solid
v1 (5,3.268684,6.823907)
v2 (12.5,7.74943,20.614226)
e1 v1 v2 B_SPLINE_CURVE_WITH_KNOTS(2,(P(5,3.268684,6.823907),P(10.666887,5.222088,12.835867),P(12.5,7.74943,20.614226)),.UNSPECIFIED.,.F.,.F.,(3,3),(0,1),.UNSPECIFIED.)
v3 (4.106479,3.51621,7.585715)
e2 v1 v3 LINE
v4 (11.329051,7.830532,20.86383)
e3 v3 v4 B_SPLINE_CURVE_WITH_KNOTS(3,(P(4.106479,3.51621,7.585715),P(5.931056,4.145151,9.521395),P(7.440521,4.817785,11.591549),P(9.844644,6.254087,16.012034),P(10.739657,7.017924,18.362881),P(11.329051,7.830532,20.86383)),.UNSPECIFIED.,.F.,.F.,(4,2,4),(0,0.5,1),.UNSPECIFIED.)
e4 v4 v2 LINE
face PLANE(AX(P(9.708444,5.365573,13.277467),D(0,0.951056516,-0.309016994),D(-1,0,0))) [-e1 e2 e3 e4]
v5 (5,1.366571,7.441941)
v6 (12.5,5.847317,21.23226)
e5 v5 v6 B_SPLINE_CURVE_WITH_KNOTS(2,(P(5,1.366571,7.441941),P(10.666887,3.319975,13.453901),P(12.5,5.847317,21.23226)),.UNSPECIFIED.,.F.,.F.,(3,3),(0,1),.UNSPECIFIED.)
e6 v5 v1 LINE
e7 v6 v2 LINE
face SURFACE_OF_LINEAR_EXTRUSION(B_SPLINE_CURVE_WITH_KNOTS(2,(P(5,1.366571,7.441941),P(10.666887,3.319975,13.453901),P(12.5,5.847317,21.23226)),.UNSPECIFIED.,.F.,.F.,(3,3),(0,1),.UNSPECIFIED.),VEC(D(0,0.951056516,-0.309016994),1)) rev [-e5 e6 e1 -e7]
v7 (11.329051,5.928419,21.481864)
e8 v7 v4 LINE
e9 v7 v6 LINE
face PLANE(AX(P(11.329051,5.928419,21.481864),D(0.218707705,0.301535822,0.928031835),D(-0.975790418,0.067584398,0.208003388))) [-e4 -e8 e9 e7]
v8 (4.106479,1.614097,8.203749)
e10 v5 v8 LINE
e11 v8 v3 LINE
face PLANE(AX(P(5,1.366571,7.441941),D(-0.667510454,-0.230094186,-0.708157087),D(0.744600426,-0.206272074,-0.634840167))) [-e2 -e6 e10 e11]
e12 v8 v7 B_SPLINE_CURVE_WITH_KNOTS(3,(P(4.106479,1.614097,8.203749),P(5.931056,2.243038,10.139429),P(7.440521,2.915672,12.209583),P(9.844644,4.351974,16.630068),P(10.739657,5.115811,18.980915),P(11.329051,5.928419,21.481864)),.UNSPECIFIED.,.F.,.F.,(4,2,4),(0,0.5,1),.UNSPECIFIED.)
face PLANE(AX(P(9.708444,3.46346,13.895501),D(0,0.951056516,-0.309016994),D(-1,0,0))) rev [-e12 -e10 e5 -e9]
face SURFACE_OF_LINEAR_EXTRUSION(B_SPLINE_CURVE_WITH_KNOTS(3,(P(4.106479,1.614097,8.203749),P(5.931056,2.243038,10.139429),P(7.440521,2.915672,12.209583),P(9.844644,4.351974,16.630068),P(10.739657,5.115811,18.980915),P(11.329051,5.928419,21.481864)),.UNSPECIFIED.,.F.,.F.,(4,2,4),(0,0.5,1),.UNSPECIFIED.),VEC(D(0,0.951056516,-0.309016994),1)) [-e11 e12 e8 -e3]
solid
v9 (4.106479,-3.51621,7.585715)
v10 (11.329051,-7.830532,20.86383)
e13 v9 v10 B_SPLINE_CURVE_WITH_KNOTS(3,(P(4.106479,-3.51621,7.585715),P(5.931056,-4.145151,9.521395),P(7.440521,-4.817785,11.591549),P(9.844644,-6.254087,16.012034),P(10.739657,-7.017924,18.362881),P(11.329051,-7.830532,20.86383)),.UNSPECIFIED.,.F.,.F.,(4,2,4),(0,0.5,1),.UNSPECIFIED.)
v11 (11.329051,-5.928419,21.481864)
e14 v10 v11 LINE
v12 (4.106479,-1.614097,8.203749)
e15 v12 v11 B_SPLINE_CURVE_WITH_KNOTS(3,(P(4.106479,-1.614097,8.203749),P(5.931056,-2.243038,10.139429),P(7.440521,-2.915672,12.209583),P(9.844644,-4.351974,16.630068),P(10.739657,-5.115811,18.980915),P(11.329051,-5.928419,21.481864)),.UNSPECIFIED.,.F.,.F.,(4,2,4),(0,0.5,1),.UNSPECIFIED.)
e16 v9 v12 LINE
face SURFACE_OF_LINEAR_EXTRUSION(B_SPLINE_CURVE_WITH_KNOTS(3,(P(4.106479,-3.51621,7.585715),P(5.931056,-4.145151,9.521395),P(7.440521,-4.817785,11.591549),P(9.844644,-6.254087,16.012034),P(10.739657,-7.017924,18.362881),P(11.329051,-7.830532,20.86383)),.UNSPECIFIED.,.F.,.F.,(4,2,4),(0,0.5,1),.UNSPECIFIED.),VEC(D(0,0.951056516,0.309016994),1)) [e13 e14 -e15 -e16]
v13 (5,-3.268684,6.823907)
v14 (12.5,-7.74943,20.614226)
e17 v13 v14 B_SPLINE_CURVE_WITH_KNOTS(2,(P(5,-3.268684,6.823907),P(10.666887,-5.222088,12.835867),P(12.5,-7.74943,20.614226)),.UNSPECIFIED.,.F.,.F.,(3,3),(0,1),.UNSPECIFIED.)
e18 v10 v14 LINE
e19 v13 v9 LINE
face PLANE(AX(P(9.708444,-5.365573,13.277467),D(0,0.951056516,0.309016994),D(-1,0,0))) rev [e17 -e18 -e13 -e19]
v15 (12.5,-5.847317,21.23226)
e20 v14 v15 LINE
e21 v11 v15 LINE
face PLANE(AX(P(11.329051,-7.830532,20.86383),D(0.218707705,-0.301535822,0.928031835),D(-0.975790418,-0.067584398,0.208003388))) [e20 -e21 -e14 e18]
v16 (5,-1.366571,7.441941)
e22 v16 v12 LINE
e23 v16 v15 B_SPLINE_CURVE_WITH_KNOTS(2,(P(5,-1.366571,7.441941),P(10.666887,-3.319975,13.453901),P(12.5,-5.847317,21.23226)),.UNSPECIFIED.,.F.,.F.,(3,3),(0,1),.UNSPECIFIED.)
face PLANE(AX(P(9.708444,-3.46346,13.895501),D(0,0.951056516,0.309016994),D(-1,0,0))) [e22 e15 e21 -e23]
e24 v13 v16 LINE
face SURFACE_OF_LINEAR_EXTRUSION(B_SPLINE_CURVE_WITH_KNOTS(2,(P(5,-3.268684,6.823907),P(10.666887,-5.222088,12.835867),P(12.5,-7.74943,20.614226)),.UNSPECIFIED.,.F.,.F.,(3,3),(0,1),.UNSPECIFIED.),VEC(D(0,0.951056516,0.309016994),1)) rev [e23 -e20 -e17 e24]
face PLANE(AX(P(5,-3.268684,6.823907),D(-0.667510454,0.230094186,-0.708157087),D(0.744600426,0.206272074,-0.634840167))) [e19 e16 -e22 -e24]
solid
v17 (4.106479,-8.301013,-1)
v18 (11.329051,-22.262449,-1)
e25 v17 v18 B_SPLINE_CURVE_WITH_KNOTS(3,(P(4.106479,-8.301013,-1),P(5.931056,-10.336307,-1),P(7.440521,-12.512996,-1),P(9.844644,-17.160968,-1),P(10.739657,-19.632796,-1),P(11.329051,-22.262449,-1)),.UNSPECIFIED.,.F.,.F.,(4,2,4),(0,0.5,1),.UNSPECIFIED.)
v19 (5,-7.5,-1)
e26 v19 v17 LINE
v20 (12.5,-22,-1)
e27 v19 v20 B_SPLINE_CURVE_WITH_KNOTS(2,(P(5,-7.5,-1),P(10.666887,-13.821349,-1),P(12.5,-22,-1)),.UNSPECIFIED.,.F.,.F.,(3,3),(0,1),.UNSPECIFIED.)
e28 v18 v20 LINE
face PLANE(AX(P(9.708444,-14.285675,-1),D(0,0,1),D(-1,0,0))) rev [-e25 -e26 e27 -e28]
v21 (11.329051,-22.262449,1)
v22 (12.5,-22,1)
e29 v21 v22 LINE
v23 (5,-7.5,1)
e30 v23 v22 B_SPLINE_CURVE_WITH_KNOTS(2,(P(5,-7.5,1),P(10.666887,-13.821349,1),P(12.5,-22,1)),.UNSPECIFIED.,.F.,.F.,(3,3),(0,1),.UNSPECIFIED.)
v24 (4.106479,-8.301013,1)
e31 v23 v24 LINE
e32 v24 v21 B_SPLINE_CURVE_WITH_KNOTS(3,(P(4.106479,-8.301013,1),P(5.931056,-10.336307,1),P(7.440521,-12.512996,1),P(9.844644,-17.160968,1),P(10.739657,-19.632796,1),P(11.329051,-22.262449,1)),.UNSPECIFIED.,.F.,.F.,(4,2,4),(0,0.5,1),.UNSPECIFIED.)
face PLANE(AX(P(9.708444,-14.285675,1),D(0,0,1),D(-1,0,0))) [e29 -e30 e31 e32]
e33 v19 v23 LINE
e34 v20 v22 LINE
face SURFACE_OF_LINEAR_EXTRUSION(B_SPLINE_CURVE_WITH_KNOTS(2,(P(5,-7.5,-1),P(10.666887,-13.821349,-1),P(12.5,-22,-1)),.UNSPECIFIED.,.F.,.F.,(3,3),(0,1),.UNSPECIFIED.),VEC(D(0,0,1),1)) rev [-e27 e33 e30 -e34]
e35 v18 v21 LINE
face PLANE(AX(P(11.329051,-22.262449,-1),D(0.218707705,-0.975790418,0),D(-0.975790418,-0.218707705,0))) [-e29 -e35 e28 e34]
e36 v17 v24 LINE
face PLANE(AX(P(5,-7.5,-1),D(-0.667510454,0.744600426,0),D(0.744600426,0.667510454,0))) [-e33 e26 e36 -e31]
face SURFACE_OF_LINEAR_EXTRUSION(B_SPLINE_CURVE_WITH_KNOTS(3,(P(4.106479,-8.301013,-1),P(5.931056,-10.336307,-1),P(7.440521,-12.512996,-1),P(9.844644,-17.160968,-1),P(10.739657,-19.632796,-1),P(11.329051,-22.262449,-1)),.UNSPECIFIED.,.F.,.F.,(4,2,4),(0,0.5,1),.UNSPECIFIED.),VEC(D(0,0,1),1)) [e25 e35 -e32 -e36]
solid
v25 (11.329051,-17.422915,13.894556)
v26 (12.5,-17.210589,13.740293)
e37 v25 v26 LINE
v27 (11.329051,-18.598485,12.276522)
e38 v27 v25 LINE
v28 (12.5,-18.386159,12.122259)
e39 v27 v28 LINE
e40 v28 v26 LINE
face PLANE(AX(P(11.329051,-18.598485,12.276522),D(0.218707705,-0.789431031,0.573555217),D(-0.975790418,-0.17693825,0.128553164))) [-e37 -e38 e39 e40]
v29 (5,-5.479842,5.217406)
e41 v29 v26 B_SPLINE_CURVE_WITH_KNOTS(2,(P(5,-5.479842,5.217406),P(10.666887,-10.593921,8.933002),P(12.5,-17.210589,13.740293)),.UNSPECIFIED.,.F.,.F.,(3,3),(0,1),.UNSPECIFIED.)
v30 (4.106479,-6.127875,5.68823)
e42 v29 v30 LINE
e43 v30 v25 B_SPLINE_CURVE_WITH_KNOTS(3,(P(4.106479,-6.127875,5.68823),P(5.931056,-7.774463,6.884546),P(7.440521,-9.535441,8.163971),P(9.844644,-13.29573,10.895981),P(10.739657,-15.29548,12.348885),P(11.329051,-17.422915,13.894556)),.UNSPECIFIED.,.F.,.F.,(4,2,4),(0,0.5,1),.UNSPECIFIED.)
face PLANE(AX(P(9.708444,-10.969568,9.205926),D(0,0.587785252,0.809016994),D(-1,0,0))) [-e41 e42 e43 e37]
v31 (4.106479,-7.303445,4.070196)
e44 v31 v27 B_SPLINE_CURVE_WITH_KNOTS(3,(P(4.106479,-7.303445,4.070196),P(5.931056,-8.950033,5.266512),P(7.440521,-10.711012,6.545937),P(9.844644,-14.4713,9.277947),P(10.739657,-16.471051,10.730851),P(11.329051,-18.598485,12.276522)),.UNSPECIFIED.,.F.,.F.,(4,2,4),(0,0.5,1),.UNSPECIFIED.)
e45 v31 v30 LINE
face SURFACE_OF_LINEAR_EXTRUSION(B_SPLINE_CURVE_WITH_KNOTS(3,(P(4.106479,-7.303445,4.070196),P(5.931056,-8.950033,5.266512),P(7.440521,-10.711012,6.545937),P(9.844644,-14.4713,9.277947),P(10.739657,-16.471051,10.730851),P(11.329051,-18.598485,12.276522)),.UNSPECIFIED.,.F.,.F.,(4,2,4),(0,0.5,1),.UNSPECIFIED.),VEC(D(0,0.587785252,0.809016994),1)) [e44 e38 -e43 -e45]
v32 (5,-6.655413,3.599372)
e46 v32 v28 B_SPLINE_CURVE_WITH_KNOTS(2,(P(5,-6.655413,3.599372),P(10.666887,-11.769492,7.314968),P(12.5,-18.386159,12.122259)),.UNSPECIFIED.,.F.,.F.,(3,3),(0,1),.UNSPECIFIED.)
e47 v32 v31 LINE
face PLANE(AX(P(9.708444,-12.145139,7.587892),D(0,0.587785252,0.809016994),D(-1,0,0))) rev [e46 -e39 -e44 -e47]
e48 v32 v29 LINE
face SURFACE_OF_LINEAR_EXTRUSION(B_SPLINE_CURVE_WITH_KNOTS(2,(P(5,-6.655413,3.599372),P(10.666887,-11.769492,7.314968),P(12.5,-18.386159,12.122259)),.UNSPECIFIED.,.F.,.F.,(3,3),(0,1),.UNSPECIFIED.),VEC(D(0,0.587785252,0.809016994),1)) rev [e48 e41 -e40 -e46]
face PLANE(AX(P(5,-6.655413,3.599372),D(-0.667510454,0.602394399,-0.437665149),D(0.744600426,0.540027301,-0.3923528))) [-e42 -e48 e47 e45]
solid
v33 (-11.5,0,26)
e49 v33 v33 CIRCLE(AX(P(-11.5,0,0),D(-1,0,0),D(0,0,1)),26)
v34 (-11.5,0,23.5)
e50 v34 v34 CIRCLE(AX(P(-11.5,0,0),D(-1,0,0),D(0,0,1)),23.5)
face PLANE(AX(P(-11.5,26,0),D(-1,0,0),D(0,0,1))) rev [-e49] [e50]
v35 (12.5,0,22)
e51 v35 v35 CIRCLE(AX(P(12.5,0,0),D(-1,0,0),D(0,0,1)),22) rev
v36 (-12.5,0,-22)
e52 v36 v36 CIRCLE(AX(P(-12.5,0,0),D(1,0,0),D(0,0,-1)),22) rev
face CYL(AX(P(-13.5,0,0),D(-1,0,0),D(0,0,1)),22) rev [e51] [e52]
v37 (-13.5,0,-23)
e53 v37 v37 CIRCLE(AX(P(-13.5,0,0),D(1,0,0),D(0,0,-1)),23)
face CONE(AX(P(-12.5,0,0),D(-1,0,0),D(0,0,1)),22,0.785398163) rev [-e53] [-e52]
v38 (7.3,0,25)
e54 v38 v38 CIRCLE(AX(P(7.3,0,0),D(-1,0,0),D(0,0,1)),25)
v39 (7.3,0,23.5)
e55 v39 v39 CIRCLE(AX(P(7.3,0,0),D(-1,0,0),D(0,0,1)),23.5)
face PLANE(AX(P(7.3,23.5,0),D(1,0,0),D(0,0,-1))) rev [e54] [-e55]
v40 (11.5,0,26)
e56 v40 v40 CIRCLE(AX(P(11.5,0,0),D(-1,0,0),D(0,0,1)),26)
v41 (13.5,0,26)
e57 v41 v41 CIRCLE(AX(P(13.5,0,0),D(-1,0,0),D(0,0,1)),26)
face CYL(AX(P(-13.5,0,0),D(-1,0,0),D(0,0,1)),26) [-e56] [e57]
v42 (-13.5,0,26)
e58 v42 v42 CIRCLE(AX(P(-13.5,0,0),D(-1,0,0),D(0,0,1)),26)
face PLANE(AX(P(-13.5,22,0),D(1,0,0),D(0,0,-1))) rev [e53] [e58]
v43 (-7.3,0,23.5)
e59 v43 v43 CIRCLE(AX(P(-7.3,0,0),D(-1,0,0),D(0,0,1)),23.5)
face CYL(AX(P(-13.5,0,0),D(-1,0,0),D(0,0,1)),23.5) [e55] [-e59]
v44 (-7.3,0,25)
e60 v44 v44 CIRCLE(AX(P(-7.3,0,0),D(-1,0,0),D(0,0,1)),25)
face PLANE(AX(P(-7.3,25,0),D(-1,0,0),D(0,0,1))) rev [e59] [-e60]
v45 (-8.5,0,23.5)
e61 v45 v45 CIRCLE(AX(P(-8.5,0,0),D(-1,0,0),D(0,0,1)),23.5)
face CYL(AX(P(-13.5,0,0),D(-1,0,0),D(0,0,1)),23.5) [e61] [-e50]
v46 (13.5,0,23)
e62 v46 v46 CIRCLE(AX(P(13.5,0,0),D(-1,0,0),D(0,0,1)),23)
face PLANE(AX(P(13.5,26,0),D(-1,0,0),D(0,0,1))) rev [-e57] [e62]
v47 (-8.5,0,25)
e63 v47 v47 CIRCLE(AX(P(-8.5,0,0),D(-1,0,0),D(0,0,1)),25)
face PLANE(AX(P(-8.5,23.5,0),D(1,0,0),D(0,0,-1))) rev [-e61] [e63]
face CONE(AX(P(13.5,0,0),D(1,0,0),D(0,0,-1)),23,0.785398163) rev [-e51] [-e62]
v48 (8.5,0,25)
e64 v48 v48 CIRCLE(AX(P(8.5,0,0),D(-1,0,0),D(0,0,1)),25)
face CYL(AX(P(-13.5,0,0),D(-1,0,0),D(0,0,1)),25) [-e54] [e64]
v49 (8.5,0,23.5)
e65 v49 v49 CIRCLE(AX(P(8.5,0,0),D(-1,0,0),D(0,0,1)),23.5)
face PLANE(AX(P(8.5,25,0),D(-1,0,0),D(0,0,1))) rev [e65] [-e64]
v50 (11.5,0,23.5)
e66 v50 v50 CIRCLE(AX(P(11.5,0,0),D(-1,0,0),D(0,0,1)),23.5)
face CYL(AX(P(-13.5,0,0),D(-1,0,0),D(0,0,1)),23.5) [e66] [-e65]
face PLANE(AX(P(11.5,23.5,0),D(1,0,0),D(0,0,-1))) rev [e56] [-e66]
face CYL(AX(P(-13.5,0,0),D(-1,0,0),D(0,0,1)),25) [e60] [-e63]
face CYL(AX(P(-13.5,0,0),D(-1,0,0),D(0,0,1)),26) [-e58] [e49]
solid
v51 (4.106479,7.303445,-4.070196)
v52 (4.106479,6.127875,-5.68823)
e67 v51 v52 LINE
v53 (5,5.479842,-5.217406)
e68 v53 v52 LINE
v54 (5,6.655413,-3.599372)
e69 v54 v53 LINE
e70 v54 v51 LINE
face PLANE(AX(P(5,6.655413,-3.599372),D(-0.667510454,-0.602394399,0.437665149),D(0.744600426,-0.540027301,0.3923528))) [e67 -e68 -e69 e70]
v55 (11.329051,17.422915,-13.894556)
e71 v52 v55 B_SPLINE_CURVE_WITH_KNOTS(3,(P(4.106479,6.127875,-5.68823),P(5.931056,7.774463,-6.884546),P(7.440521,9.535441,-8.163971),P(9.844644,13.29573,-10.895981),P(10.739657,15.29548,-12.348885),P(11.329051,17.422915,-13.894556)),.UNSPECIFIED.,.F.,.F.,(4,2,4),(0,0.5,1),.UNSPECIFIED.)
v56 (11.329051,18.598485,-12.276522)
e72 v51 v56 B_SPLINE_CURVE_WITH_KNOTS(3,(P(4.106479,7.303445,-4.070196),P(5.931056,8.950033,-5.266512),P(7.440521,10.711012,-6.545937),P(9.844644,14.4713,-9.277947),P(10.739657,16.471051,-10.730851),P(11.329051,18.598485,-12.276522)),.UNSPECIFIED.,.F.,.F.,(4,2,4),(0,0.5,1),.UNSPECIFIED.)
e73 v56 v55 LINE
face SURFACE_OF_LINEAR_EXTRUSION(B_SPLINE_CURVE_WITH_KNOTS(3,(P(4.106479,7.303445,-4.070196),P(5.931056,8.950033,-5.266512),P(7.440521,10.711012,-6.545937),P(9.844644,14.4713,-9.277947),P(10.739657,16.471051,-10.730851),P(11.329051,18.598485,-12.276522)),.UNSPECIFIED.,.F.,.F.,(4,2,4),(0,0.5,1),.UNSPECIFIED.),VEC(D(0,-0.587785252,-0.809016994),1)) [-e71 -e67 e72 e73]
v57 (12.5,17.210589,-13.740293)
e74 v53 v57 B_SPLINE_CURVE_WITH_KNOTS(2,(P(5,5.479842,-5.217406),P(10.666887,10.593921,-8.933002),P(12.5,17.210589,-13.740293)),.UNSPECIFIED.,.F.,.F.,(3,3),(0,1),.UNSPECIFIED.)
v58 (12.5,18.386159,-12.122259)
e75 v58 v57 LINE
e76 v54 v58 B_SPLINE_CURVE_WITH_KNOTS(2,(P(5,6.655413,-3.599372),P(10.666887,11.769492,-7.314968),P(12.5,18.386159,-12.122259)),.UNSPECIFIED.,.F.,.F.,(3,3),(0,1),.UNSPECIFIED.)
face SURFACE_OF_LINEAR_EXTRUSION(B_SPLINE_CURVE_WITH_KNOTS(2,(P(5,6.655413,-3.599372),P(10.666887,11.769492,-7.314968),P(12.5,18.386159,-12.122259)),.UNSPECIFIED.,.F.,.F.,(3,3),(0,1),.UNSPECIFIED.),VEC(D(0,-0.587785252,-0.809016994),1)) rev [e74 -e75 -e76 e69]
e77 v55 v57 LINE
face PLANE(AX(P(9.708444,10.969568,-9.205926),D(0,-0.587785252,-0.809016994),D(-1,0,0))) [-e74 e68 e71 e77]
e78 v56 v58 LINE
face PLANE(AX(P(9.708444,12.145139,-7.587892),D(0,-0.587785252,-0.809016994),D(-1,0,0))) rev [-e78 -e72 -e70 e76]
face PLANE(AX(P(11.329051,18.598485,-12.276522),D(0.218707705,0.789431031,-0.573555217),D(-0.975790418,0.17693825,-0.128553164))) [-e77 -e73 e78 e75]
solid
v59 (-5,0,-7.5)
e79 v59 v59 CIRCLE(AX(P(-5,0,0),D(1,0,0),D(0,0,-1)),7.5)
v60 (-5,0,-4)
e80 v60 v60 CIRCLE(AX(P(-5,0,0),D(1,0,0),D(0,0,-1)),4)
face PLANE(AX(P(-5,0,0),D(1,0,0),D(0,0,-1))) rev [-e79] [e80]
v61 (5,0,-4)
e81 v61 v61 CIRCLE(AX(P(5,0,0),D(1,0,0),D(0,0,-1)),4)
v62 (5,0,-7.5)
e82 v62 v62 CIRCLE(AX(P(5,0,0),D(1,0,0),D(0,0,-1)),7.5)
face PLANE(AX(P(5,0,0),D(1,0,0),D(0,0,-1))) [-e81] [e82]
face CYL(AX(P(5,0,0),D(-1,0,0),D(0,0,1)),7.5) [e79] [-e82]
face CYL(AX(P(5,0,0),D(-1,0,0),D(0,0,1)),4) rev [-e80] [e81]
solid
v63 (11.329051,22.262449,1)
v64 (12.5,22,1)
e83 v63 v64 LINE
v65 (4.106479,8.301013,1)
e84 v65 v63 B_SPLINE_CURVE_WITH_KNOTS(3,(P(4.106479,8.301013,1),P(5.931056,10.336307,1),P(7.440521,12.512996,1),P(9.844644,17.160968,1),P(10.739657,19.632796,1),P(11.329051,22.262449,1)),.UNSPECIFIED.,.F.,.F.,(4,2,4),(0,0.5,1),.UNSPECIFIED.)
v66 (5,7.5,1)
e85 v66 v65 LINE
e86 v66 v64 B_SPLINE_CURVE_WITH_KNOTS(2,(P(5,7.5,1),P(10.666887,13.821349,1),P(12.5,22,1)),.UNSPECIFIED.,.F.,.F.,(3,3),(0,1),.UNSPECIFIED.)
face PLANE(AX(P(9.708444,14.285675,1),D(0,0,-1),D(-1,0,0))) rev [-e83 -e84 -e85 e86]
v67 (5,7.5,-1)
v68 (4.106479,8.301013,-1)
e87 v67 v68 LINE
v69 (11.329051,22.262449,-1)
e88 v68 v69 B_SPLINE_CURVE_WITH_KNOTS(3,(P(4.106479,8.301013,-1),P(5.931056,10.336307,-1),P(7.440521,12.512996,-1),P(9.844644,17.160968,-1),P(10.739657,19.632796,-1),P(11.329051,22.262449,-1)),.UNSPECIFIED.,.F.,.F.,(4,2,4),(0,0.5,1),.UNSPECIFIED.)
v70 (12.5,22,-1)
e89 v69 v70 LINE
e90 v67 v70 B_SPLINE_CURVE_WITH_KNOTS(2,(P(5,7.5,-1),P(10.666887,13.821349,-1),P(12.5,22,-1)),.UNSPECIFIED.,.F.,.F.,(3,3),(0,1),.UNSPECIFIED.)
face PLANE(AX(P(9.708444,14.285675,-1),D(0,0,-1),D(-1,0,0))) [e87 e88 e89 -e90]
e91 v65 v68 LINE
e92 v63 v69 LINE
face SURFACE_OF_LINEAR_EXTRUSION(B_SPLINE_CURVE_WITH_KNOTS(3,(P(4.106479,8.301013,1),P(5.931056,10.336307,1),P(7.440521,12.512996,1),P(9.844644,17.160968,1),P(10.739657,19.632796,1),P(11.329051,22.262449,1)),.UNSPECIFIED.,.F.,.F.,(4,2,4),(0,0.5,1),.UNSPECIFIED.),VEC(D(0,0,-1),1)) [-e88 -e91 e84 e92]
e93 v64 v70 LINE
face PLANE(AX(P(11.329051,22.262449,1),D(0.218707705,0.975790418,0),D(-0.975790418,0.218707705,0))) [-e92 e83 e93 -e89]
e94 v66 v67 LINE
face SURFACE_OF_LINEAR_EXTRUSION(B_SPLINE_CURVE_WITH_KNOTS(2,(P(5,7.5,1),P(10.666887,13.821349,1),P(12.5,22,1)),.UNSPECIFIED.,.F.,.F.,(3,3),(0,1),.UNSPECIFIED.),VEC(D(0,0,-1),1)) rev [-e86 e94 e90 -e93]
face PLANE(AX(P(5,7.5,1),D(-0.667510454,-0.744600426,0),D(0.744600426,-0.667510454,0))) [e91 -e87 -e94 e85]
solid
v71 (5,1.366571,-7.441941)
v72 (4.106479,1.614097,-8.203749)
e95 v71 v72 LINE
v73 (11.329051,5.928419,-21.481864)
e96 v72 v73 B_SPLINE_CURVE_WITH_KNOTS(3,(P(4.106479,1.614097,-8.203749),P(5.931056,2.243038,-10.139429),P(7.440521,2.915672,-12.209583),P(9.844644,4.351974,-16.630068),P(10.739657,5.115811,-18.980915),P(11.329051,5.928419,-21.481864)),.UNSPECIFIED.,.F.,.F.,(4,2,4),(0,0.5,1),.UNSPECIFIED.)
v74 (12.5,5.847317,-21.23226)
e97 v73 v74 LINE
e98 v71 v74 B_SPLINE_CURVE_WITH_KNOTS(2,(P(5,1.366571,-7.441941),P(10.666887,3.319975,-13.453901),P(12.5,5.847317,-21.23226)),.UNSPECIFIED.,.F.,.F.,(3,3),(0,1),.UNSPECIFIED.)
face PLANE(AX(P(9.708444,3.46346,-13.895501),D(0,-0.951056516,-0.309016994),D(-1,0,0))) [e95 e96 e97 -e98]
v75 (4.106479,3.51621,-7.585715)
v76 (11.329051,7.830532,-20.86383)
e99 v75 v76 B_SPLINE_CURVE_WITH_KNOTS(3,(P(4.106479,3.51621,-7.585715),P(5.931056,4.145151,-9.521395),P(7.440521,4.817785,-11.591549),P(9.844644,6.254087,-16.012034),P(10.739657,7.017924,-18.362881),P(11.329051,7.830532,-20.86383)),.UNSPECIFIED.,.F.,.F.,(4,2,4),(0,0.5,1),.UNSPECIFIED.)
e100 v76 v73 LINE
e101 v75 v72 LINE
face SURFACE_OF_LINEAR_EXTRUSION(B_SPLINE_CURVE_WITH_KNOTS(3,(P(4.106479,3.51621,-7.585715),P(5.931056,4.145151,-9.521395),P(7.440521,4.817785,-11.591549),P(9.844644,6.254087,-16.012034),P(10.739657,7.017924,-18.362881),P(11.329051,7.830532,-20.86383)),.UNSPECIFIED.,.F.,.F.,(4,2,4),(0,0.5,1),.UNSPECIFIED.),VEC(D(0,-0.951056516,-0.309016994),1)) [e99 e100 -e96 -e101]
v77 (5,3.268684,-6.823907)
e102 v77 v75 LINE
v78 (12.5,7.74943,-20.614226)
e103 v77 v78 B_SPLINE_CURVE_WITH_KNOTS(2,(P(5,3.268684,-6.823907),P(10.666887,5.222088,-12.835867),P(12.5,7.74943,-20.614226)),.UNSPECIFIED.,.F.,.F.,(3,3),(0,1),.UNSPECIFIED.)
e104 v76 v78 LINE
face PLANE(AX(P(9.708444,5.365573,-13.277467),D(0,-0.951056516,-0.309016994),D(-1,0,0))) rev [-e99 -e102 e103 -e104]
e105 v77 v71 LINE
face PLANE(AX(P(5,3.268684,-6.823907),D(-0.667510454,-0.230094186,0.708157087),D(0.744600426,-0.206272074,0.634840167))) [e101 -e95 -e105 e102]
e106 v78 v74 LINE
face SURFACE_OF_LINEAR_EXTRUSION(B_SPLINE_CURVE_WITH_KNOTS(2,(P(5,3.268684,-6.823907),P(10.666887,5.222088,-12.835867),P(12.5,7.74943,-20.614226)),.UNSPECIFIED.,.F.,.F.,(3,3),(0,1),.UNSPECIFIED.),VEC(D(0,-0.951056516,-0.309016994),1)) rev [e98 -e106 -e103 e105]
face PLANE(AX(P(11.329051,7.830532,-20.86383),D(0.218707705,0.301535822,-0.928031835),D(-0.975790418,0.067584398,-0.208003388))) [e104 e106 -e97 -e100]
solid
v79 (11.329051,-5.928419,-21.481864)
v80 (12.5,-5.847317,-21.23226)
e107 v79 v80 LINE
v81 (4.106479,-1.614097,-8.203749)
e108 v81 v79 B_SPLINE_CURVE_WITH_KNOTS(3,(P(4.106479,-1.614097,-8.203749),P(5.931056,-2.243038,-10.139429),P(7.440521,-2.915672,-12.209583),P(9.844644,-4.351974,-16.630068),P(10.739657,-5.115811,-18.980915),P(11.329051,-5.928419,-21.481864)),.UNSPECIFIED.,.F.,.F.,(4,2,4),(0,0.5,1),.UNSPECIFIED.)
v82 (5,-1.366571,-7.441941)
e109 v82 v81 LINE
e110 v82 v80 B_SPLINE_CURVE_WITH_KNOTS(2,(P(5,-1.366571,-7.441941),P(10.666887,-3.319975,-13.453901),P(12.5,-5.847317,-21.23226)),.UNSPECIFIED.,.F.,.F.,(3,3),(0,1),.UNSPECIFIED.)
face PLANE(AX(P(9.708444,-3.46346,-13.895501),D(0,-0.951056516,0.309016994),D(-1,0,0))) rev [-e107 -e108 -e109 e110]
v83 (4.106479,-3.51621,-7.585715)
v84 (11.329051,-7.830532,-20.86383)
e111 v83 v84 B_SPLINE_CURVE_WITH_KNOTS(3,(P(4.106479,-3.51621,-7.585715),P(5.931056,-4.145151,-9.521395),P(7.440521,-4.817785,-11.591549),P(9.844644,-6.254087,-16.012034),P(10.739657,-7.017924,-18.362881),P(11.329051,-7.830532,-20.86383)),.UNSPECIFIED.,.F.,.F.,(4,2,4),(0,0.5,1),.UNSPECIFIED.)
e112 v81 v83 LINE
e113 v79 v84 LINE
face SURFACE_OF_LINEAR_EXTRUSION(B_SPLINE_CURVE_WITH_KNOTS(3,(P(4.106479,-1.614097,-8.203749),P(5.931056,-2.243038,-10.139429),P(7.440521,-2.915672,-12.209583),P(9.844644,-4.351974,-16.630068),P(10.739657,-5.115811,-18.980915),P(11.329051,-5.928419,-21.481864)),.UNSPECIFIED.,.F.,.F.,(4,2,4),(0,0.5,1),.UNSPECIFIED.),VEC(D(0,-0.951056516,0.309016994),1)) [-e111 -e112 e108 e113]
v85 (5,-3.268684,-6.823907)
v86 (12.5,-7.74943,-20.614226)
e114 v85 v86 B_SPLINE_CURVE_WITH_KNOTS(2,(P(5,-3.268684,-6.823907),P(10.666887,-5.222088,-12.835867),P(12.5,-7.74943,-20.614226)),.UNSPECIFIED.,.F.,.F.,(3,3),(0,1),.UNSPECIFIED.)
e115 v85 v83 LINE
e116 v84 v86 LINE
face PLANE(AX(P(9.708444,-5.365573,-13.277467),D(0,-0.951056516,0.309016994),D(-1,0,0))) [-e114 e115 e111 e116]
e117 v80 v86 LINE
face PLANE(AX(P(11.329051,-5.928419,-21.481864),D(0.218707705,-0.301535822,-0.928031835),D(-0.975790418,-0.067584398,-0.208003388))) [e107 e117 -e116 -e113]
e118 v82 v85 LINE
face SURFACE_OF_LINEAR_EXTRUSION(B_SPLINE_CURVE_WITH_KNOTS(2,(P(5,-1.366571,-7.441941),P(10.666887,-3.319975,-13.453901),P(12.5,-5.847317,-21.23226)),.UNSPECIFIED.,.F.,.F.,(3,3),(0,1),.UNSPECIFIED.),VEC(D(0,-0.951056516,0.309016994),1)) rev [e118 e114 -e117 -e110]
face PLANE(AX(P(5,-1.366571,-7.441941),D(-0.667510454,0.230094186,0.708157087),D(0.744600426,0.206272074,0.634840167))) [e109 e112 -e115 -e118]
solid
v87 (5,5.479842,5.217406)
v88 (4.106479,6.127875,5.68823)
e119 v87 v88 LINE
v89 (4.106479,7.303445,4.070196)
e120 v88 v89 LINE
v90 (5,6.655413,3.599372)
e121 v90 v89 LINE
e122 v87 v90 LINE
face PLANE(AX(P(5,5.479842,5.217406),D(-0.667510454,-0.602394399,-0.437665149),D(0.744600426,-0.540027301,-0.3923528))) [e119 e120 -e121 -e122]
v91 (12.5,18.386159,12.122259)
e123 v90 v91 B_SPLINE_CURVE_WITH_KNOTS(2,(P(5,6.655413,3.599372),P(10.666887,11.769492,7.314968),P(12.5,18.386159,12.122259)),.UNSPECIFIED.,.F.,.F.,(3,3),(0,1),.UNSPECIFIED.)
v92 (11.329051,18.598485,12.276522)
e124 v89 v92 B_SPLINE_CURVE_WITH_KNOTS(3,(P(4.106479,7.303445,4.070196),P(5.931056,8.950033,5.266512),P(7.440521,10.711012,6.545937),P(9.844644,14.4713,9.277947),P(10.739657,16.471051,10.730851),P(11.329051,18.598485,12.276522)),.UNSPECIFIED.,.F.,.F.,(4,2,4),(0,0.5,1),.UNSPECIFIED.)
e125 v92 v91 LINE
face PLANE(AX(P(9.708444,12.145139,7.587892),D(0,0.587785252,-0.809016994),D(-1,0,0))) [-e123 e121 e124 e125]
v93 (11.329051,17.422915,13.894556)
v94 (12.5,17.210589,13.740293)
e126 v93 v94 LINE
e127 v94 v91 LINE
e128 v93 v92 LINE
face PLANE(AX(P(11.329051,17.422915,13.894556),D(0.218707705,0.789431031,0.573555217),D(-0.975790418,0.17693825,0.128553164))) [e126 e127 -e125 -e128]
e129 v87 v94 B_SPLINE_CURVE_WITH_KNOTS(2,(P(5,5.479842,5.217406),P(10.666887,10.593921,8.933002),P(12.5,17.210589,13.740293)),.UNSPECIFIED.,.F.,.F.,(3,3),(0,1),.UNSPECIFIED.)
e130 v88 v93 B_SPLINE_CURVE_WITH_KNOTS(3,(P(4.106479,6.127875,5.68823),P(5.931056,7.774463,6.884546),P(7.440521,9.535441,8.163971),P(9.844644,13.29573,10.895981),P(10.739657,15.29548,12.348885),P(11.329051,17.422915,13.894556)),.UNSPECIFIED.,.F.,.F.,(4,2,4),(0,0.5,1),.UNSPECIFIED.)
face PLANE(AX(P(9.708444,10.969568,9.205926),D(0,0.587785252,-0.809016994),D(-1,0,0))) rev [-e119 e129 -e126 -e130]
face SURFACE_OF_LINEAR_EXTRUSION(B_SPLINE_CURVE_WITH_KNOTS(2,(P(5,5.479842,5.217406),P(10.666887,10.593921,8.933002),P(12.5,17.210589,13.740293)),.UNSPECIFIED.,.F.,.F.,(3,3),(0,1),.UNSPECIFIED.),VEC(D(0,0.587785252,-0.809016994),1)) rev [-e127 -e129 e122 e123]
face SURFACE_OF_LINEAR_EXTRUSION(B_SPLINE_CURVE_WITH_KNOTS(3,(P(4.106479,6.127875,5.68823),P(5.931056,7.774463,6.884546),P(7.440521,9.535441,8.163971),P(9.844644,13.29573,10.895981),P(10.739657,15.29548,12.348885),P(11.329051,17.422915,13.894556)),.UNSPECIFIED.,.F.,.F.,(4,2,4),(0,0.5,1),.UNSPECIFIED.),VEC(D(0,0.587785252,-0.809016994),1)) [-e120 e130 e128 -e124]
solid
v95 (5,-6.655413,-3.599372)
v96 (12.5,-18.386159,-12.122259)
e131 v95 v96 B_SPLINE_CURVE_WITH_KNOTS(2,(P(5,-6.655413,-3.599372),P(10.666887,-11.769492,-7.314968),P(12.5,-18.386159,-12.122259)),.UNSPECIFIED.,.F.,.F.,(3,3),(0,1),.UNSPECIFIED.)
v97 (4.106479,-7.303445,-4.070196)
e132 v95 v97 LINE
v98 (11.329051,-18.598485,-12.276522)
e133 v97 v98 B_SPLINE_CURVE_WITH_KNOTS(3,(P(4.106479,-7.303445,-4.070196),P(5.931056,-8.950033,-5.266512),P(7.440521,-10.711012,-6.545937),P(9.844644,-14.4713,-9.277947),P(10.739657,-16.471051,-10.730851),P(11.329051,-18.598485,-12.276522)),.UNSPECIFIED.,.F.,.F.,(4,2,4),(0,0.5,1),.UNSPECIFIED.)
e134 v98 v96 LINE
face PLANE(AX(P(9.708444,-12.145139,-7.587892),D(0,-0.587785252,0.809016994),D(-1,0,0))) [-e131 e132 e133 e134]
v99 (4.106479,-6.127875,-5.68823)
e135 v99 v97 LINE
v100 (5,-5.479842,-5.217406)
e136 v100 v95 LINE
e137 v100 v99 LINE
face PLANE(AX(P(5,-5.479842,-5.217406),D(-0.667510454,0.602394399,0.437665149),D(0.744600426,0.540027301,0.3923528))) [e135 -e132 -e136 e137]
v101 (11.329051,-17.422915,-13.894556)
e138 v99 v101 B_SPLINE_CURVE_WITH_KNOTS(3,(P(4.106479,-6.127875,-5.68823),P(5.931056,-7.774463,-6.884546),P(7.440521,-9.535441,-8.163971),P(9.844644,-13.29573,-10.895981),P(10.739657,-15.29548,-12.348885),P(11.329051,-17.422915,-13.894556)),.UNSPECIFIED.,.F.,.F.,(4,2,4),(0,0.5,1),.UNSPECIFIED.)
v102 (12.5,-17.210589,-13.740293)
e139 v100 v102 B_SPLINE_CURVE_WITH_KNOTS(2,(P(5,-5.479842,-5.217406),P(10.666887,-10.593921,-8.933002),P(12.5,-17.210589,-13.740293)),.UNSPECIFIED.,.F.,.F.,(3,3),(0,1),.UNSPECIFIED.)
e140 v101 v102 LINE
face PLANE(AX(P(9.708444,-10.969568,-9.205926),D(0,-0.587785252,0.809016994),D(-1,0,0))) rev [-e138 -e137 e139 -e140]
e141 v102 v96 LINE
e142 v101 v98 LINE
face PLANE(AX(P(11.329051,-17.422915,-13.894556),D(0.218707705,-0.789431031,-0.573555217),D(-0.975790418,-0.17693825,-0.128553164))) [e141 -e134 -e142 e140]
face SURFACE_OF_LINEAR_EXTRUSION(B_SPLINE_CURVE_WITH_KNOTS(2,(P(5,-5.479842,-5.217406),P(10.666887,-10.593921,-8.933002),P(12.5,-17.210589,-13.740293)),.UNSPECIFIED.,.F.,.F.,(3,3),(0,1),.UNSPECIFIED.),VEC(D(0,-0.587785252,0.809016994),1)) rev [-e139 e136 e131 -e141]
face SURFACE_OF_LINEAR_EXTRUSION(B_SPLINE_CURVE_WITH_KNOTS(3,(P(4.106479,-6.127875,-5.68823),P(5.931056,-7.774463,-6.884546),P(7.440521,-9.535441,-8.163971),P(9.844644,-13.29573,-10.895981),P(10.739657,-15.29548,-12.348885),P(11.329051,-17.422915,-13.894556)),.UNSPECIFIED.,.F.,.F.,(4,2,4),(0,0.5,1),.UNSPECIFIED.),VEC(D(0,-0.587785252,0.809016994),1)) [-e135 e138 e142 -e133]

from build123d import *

# Parameters (mm, degrees)
CHAMFER1_SIZE       = 1
SKETCH2_R           = 7.5
SKETCH2_R_2         = 4
BOSS_EXTRUDE1_DEPTH = 5
EXTRUDE_THIN2_START = -1
EXTRUDE_THIN2_DEPTH = 2
CIRPATTERN1_COUNT   = 10


# Read off the part's stored shape, not the designer's step: Extrude-Thin2
with BuildPart() as part:
    # Sketch1 → Revolve1 (revolve)
    with BuildSketch(Plane.XY, mode=Mode.PRIVATE) as revolve1_sk:
        Polygon((-13.5, 22), (13.5, 22), (13.5, 26), (11.5, 26), (11.5, 23.5), (8.5, 23.5), (8.5, 25), (7.3, 25), (7.3, 23.5), (-7.3, 23.5), (-7.3, 25), (-8.5, 25), (-8.5, 23.5), (-11.5, 23.5), (-11.5, 26), (-13.5, 26), align=None)
    revolve(revolve1_sk.sketch.rotate(Axis((-13.5, 0, 0), (1, 0, 0)), 90), axis=Axis((-13.5, 0, 0), (1, 0, 0)))

    # Chamfer1
    chamfer1_edges = [part.edges().sort_by_distance(p)[0] for p in [
        (-13.5, 0, -22),
        (13.5, 0, -22),
    ]]
    chamfer(chamfer1_edges, length=CHAMFER1_SIZE)


with BuildPart() as body_2:
    # Sketch2 → Boss-Extrude1 (new, symmetric)
    with BuildSketch(Plane(origin=(0, 0, 0), x_dir=(0, 0, -1), z_dir=(1, 0, 0))):
        Circle(SKETCH2_R)
        Circle(SKETCH2_R_2, mode=Mode.SUBTRACT)
    extrude(amount=BOSS_EXTRUDE1_DEPTH, both=True)


with BuildPart() as body_3:
    # Extrude-Thin2 outline → Extrude-Thin2 (new body)
    with BuildSketch(Plane.XY.offset(EXTRUDE_THIN2_START)):
        with BuildLine():
            Line((4.106479489, 8.301012544), (5, 7.5))
            add(Edge.make_bspline(
                [(5, 7.5), (10.666887119, 13.821349036), (12.5, 22)],
                knots=[0, 0, 0, 1, 1, 1], degree=2))
            Line((12.5, 22), (11.329051499, 22.262449246))
            add(Edge.make_bspline(
                [(4.106479489, 8.301012544), (5.931055828, 10.336306991), (7.44052062, 12.512995937), (9.844644155, 17.160968105), (10.739657019, 19.632795732), (11.329051499, 22.262449246)],
                knots=[0, 0, 0, 0, 0.5, 0.5, 1, 1, 1, 1], degree=3))
        make_face()
    extrude(amount=EXTRUDE_THIN2_DEPTH)


with BuildPart() as cirpattern1_1:
    # CirPattern1: pattern copy
    add(body_3.part.rotate(Axis((5, 0, 0), (1, 0, 0)), 1 * 360 / CIRPATTERN1_COUNT))


with BuildPart() as cirpattern1_2:
    # CirPattern1: pattern copy
    add(body_3.part.rotate(Axis((5, 0, 0), (1, 0, 0)), 2 * 360 / CIRPATTERN1_COUNT))


with BuildPart() as cirpattern1_3:
    # CirPattern1: pattern copy
    add(body_3.part.rotate(Axis((5, 0, 0), (1, 0, 0)), 3 * 360 / CIRPATTERN1_COUNT))


with BuildPart() as cirpattern1_4:
    # CirPattern1: pattern copy
    add(body_3.part.rotate(Axis((5, 0, 0), (1, 0, 0)), 4 * 360 / CIRPATTERN1_COUNT))


with BuildPart() as cirpattern1_5:
    # CirPattern1: pattern copy
    add(body_3.part.rotate(Axis((5, 0, 0), (1, 0, 0)), 5 * 360 / CIRPATTERN1_COUNT))


with BuildPart() as cirpattern1_6:
    # CirPattern1: pattern copy
    add(body_3.part.rotate(Axis((5, 0, 0), (1, 0, 0)), 6 * 360 / CIRPATTERN1_COUNT))


with BuildPart() as cirpattern1_7:
    # CirPattern1: pattern copy
    add(body_3.part.rotate(Axis((5, 0, 0), (1, 0, 0)), 7 * 360 / CIRPATTERN1_COUNT))


with BuildPart() as cirpattern1_8:
    # CirPattern1: pattern copy
    add(body_3.part.rotate(Axis((5, 0, 0), (1, 0, 0)), 8 * 360 / CIRPATTERN1_COUNT))


with BuildPart() as cirpattern1_9:
    # CirPattern1: pattern copy
    add(body_3.part.rotate(Axis((5, 0, 0), (1, 0, 0)), 9 * 360 / CIRPATTERN1_COUNT))


solid = Compound([part.part, body_2.part, body_3.part, cirpattern1_1.part, cirpattern1_2.part, cirpattern1_3.part, cirpattern1_4.part, cirpattern1_5.part, cirpattern1_6.part, cirpattern1_7.part, cirpattern1_8.part, cirpattern1_9.part])
